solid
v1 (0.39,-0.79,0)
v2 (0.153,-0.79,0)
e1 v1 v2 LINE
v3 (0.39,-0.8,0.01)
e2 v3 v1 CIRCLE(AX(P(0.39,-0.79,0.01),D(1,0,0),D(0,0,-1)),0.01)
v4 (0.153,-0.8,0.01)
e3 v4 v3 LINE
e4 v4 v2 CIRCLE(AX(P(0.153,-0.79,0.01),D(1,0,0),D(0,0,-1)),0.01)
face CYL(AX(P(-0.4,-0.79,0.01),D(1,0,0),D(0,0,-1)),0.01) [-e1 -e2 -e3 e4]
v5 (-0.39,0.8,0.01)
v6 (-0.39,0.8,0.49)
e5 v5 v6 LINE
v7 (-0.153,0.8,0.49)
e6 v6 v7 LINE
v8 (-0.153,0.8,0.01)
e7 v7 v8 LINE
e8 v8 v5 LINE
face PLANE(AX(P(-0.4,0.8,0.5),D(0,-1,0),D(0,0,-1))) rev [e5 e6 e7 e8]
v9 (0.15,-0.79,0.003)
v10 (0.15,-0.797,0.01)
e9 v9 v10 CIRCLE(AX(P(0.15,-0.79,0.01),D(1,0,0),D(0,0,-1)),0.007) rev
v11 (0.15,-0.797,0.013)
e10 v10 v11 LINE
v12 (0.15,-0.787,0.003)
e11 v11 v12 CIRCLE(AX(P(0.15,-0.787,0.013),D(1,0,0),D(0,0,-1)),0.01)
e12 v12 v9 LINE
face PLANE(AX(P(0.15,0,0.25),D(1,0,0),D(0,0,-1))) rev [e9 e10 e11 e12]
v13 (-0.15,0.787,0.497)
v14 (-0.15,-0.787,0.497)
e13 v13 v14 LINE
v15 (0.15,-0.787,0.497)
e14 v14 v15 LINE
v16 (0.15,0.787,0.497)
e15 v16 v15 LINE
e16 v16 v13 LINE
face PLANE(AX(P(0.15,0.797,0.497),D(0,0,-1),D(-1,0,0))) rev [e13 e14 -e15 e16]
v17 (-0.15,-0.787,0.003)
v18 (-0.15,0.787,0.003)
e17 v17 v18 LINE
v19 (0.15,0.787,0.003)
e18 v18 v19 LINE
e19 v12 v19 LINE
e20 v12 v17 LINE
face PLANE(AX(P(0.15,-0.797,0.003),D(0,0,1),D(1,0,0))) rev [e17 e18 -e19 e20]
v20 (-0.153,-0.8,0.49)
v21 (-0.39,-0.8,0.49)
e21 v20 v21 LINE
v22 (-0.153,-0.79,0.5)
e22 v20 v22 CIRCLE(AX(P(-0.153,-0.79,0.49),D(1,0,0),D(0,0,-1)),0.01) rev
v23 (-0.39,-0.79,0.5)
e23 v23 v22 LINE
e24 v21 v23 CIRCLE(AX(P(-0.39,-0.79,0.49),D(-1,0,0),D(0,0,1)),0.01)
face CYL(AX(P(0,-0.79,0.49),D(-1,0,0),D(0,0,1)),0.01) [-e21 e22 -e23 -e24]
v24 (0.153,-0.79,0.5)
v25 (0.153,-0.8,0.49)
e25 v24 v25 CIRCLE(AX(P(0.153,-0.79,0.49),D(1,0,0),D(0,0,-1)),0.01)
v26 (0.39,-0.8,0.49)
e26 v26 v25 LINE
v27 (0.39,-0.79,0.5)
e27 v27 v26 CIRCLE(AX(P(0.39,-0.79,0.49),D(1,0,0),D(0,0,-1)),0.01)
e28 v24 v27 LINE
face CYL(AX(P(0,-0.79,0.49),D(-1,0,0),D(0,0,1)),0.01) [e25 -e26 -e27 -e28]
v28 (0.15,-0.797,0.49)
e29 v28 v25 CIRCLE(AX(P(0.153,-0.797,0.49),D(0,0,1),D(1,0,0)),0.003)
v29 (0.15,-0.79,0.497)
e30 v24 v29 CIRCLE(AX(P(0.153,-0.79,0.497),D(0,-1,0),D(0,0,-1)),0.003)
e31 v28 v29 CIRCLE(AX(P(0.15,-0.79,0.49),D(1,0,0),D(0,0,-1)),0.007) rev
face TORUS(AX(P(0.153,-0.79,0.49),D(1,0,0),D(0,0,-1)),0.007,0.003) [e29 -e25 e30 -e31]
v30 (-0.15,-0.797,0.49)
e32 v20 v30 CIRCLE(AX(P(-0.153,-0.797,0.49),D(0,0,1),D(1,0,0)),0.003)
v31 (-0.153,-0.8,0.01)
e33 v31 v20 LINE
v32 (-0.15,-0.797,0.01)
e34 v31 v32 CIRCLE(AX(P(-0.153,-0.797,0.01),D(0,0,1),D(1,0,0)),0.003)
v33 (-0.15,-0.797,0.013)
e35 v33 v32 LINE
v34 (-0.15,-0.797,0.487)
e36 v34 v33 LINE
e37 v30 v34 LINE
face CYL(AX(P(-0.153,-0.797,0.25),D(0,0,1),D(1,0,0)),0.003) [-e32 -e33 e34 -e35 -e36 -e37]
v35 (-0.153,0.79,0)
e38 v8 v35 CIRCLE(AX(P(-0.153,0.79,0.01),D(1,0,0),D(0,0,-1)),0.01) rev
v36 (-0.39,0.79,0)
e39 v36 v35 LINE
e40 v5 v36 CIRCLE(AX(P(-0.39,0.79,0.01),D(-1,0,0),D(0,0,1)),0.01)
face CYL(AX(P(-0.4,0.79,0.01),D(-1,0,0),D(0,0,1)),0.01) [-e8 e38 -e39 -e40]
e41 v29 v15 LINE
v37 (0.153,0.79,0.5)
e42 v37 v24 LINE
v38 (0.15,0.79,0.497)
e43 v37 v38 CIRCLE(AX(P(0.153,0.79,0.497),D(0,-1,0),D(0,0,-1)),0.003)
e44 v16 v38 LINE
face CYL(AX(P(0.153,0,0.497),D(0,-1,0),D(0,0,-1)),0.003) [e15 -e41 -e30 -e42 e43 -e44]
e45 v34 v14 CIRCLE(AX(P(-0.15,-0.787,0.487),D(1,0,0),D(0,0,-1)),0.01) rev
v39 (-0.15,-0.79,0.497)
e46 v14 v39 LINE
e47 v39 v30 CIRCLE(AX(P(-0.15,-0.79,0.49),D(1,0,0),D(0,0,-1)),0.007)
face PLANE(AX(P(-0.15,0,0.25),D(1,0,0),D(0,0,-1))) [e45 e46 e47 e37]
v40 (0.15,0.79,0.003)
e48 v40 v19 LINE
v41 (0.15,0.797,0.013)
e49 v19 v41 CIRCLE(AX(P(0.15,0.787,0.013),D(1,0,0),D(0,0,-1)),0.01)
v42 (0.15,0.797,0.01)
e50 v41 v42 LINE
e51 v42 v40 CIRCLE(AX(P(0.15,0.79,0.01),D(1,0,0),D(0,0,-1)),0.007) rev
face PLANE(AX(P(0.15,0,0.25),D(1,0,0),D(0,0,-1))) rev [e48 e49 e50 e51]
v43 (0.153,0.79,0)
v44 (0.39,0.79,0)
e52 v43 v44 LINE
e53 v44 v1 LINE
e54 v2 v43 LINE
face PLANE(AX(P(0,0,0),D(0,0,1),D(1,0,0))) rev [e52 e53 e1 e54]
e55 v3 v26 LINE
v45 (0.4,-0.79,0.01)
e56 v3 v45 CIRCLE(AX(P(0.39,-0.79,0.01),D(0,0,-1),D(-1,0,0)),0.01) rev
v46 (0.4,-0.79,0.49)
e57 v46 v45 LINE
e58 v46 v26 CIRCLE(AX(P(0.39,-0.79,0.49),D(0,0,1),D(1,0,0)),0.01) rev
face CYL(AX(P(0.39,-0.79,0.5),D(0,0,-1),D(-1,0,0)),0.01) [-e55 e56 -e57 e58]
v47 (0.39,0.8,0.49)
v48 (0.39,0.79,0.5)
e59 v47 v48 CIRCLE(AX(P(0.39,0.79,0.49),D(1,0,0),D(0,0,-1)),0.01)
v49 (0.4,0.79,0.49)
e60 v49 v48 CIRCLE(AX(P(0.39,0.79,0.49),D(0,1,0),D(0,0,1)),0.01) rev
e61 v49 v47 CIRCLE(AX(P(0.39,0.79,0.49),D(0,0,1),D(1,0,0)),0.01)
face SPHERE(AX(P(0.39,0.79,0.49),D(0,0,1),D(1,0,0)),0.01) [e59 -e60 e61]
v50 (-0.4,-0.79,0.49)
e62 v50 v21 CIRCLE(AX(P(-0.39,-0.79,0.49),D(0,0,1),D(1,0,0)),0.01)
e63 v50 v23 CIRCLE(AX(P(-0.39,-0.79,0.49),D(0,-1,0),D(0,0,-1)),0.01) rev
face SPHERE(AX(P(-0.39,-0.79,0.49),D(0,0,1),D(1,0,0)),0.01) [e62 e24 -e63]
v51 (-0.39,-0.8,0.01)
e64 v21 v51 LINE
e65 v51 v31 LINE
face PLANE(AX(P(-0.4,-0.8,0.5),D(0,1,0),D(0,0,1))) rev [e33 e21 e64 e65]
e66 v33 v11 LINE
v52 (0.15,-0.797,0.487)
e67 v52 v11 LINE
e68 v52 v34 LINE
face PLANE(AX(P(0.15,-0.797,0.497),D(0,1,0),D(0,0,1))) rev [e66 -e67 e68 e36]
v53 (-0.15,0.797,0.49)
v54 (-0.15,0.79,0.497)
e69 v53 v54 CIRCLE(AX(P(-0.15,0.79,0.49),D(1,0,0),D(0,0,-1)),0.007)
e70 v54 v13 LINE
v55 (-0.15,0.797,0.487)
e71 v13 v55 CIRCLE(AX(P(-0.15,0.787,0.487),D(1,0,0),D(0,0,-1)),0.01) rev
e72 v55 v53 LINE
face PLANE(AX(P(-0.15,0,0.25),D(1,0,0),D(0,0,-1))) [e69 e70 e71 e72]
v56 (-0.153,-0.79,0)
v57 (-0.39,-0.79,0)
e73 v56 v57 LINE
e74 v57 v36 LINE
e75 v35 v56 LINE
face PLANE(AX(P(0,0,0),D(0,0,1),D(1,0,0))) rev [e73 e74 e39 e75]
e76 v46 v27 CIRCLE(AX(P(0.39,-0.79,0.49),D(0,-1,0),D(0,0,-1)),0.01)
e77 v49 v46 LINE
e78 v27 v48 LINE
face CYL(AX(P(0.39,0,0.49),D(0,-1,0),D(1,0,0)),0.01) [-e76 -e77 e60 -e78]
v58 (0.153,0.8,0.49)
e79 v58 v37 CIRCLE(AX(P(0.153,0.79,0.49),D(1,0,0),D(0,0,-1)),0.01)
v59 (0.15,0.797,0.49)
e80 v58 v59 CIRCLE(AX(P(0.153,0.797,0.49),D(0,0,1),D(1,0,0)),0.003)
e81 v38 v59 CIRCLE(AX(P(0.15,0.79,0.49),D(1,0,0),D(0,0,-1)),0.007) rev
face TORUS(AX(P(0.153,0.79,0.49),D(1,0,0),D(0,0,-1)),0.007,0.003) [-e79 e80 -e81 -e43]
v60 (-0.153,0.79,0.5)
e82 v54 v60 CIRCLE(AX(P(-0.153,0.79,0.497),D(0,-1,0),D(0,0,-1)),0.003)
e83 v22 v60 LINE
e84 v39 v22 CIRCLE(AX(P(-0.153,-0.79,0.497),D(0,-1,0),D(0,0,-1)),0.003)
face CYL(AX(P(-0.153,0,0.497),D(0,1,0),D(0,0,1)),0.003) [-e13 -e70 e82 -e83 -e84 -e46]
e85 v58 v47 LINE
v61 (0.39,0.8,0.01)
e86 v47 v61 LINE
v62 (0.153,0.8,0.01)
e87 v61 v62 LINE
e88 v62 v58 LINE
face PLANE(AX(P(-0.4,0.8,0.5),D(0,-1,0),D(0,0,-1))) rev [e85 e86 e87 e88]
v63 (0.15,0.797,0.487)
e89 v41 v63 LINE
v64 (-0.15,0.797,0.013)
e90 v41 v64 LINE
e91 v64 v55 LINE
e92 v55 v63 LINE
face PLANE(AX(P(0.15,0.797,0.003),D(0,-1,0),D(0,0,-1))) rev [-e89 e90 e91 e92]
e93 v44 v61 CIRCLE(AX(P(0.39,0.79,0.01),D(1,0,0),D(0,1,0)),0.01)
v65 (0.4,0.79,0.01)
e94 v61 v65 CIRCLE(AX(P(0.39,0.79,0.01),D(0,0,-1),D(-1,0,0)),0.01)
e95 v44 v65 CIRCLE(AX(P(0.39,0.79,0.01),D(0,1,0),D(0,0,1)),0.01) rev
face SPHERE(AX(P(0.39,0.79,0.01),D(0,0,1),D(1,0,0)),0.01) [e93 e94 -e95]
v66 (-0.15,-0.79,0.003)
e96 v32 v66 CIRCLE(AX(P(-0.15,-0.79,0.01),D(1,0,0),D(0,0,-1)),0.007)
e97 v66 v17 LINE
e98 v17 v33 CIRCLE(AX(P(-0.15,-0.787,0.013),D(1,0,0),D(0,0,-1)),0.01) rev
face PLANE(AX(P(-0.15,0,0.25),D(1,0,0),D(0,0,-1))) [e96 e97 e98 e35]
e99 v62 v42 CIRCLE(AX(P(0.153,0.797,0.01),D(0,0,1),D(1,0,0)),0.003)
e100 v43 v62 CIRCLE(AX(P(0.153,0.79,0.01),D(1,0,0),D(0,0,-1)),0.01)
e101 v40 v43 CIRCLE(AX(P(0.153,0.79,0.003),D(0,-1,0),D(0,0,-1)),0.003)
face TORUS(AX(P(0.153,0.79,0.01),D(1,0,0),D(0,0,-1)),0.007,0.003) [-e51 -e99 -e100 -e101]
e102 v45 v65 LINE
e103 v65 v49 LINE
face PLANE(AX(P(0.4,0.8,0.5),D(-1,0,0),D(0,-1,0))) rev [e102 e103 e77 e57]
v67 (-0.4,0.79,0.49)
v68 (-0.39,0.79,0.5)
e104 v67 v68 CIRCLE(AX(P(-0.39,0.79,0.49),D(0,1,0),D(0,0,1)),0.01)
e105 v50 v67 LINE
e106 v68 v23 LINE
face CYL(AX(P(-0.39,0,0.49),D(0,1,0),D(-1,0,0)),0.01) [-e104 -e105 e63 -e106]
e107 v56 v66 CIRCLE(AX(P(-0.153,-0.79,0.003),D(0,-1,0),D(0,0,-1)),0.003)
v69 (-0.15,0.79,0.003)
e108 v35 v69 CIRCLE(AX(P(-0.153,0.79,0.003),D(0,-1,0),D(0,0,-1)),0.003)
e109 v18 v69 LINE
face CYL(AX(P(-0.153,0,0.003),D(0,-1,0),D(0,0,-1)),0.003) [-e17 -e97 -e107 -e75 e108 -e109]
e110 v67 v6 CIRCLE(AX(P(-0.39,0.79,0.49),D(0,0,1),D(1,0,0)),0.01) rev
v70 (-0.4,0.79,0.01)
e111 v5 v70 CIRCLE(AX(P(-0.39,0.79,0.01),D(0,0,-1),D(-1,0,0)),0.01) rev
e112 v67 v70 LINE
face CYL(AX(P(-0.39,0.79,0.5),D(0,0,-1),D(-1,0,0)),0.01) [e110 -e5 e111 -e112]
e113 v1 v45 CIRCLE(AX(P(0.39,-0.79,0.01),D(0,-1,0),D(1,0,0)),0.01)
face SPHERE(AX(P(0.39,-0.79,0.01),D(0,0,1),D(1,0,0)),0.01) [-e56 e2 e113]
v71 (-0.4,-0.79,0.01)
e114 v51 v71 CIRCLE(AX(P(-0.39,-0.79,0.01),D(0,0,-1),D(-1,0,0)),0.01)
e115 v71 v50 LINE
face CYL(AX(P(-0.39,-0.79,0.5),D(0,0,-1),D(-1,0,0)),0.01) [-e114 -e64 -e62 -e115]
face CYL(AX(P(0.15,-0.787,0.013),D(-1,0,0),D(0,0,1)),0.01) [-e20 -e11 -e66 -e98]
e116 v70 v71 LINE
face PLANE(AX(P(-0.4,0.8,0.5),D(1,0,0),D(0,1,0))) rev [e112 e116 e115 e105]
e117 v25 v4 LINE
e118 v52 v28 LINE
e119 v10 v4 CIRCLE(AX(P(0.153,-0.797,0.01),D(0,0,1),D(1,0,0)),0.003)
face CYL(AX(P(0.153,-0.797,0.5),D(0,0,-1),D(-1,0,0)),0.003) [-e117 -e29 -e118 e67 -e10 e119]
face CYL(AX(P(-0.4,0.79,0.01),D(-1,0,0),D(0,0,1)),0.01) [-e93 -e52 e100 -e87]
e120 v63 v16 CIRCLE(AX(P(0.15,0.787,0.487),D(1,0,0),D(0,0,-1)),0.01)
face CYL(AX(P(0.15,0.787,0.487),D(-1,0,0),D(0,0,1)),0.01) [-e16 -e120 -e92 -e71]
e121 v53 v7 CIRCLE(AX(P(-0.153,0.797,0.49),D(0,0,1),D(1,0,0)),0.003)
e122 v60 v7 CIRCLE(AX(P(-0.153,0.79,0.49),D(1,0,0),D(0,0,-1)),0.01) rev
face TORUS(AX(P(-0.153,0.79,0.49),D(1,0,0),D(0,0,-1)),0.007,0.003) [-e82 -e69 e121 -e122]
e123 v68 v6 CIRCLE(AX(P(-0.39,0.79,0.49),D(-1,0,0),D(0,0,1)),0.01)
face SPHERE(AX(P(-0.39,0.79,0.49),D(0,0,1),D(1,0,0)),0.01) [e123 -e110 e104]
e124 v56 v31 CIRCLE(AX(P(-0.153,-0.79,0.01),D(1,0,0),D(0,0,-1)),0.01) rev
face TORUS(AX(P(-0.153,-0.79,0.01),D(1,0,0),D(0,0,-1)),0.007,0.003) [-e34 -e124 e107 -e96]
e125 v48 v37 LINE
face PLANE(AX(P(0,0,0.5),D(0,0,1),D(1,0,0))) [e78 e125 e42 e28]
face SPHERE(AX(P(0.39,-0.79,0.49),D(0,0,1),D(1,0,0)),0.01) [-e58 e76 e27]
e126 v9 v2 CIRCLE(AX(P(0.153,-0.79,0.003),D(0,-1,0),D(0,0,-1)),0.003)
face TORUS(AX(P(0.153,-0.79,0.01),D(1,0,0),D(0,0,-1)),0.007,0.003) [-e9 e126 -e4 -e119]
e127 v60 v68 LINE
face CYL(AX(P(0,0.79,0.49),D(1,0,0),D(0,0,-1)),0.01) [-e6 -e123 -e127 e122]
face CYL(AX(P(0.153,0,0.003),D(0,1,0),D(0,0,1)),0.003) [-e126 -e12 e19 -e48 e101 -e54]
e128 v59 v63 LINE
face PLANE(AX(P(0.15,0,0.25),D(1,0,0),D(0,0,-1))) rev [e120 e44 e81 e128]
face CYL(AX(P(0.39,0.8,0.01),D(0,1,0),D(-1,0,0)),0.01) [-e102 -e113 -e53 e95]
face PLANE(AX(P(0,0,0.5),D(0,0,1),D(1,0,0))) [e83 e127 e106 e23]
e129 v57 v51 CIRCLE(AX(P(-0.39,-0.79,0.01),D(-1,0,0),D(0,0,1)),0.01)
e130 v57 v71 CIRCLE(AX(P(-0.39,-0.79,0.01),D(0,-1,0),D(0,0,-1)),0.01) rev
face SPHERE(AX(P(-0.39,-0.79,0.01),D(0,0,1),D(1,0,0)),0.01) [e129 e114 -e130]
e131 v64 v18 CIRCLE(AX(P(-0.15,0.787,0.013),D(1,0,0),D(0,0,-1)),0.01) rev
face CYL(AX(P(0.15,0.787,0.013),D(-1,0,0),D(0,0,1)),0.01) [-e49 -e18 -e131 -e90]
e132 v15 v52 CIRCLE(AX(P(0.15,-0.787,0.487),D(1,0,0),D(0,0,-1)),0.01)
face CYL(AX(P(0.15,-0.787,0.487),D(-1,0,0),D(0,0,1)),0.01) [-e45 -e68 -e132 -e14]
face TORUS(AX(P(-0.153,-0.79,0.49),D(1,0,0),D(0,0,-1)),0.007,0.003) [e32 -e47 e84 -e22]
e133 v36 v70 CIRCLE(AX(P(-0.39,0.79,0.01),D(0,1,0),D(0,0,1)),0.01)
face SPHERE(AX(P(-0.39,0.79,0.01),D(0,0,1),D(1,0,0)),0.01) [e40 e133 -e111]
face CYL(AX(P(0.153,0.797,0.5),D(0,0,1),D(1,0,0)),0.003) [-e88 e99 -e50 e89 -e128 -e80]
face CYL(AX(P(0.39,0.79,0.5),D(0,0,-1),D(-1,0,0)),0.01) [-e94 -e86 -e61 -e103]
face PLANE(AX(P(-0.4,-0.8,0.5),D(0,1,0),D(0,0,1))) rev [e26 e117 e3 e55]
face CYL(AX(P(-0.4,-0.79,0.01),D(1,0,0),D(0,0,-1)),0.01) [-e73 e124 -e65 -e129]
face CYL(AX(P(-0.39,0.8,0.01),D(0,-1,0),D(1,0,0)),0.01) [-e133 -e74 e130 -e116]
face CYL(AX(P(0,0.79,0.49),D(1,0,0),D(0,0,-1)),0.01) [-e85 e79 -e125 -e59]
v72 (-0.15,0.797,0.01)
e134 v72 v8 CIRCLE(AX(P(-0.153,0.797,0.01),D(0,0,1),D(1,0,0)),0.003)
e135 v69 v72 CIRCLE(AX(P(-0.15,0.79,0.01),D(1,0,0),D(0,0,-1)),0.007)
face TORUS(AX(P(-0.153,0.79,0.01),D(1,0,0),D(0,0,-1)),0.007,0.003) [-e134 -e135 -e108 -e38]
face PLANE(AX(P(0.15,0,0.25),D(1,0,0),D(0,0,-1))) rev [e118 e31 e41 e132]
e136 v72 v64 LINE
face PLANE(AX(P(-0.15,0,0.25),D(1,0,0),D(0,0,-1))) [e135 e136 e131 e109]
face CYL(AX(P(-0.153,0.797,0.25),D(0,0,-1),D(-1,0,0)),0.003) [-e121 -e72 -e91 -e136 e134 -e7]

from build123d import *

# Parameters (mm, degrees)
SKETCH1_W                           = 0.8
SKETCH1_H                           = 1.6
ALL_BODY_DEPTH                      = 0.5
CUT_OUT_THE_BODY_FOR_PIN_DEPTH      = 0.15
CUT_OUT_THE_BODY_FOR_PIN_DEPTH_BACK = 0.15
SKETCH2_OUTSIDE_W                   = 2.872
SKETCH2_OUTSIDE_H                   = 3.972
SKETCH2_OUTSIDE_W_2                 = 0.494
SKETCH2_OUTSIDE_H_2                 = 1.594
BODY_FILLET_R                       = 0.01
PIN_FILLET_A_R                      = 0.01
PIN_FILLET_B_R                      = 0.003


with BuildPart() as part:
    # Sketch1 → All body (new body)
    with BuildSketch(Plane.XY):
        Rectangle(SKETCH1_W, SKETCH1_H)
    extrude(amount=ALL_BODY_DEPTH)

    # Sketch2 outside → Cut out the body for pin (cut, two sides: drawn at the far end of the back side and taken through both)
    with BuildSketch(Plane(origin=(0, 0, 0), x_dir=(0, 0, -1), z_dir=(1, 0, 0)).offset(-CUT_OUT_THE_BODY_FOR_PIN_DEPTH_BACK)):
        with Locations((-0.25, 0)):
            Rectangle(SKETCH2_OUTSIDE_W, SKETCH2_OUTSIDE_H)
        with Locations((-0.25, 0)):
            Rectangle(SKETCH2_OUTSIDE_W_2, SKETCH2_OUTSIDE_H_2, mode=Mode.SUBTRACT)
    extrude(amount=CUT_OUT_THE_BODY_FOR_PIN_DEPTH + CUT_OUT_THE_BODY_FOR_PIN_DEPTH_BACK, mode=Mode.SUBTRACT)

    # Body fillet
    body_fillet_edges = [part.edges().sort_by_distance(p)[0] for p in [
        (0, 0.797, 0.003),
        (0, 0.797, 0.497),
        (0, -0.797, 0.497),
        (0, -0.797, 0.003),
    ]]
    fillet(body_fillet_edges, radius=BODY_FILLET_R)

    # Pin fillet a
    pin_fillet_a_edges = [part.edges().sort_by_distance(p)[0] for p in [
        (0.4, 0, 0.5),
        (-0.275, 0.8, 0),
        (0.275, -0.8, 0),
        (0.275, -0.8, 0.5),
        (-0.275, 0.8, 0.5),
        (0.275, 0.8, 0.5),
        (-0.4, 0, 0.5),
        (0.275, 0.8, 0),
        (0.4, 0, 0),
        (-0.275, -0.8, 0),
        (-0.4, 0, 0),
        (-0.4, 0.8, 0.25),
        (0.4, 0.8, 0.25),
        (0.4, -0.8, 0.25),
        (-0.4, -0.8, 0.25),
        (-0.275, -0.8, 0.5),
    ]]
    fillet(pin_fillet_a_edges, radius=PIN_FILLET_A_R)

    # Pin fillet b
    pin_fillet_b_edges = [part.edges().sort_by_distance(p)[0] for p in [
        (0.15, -0.8, 0.25),
        (0.15, 0, 0.5),
        (0.15, 0.8, 0.25),
        (0.15, 0, 0),
        (-0.15, 0.8, 0.25),
        (-0.15, 0, 0.5),
        (-0.15, -0.8, 0.25),
        (-0.15, 0, 0),
        (0.15, 0.797071068, 0.002928932),
        (0.15, -0.797071068, 0.002928932),
        (0.15, -0.797071068, 0.497071068),
        (0.15, 0.797071068, 0.497071068),
        (-0.15, -0.797071068, 0.497071068),
        (-0.15, 0.797071068, 0.497071068),
        (-0.15, -0.797071068, 0.002928932),
        (-0.15, 0.797071068, 0.002928932),
    ]]
    fillet(pin_fillet_b_edges, radius=PIN_FILLET_B_R - 0.0001)  # a hair under: the kernel refuses the full size


solid = part.part
